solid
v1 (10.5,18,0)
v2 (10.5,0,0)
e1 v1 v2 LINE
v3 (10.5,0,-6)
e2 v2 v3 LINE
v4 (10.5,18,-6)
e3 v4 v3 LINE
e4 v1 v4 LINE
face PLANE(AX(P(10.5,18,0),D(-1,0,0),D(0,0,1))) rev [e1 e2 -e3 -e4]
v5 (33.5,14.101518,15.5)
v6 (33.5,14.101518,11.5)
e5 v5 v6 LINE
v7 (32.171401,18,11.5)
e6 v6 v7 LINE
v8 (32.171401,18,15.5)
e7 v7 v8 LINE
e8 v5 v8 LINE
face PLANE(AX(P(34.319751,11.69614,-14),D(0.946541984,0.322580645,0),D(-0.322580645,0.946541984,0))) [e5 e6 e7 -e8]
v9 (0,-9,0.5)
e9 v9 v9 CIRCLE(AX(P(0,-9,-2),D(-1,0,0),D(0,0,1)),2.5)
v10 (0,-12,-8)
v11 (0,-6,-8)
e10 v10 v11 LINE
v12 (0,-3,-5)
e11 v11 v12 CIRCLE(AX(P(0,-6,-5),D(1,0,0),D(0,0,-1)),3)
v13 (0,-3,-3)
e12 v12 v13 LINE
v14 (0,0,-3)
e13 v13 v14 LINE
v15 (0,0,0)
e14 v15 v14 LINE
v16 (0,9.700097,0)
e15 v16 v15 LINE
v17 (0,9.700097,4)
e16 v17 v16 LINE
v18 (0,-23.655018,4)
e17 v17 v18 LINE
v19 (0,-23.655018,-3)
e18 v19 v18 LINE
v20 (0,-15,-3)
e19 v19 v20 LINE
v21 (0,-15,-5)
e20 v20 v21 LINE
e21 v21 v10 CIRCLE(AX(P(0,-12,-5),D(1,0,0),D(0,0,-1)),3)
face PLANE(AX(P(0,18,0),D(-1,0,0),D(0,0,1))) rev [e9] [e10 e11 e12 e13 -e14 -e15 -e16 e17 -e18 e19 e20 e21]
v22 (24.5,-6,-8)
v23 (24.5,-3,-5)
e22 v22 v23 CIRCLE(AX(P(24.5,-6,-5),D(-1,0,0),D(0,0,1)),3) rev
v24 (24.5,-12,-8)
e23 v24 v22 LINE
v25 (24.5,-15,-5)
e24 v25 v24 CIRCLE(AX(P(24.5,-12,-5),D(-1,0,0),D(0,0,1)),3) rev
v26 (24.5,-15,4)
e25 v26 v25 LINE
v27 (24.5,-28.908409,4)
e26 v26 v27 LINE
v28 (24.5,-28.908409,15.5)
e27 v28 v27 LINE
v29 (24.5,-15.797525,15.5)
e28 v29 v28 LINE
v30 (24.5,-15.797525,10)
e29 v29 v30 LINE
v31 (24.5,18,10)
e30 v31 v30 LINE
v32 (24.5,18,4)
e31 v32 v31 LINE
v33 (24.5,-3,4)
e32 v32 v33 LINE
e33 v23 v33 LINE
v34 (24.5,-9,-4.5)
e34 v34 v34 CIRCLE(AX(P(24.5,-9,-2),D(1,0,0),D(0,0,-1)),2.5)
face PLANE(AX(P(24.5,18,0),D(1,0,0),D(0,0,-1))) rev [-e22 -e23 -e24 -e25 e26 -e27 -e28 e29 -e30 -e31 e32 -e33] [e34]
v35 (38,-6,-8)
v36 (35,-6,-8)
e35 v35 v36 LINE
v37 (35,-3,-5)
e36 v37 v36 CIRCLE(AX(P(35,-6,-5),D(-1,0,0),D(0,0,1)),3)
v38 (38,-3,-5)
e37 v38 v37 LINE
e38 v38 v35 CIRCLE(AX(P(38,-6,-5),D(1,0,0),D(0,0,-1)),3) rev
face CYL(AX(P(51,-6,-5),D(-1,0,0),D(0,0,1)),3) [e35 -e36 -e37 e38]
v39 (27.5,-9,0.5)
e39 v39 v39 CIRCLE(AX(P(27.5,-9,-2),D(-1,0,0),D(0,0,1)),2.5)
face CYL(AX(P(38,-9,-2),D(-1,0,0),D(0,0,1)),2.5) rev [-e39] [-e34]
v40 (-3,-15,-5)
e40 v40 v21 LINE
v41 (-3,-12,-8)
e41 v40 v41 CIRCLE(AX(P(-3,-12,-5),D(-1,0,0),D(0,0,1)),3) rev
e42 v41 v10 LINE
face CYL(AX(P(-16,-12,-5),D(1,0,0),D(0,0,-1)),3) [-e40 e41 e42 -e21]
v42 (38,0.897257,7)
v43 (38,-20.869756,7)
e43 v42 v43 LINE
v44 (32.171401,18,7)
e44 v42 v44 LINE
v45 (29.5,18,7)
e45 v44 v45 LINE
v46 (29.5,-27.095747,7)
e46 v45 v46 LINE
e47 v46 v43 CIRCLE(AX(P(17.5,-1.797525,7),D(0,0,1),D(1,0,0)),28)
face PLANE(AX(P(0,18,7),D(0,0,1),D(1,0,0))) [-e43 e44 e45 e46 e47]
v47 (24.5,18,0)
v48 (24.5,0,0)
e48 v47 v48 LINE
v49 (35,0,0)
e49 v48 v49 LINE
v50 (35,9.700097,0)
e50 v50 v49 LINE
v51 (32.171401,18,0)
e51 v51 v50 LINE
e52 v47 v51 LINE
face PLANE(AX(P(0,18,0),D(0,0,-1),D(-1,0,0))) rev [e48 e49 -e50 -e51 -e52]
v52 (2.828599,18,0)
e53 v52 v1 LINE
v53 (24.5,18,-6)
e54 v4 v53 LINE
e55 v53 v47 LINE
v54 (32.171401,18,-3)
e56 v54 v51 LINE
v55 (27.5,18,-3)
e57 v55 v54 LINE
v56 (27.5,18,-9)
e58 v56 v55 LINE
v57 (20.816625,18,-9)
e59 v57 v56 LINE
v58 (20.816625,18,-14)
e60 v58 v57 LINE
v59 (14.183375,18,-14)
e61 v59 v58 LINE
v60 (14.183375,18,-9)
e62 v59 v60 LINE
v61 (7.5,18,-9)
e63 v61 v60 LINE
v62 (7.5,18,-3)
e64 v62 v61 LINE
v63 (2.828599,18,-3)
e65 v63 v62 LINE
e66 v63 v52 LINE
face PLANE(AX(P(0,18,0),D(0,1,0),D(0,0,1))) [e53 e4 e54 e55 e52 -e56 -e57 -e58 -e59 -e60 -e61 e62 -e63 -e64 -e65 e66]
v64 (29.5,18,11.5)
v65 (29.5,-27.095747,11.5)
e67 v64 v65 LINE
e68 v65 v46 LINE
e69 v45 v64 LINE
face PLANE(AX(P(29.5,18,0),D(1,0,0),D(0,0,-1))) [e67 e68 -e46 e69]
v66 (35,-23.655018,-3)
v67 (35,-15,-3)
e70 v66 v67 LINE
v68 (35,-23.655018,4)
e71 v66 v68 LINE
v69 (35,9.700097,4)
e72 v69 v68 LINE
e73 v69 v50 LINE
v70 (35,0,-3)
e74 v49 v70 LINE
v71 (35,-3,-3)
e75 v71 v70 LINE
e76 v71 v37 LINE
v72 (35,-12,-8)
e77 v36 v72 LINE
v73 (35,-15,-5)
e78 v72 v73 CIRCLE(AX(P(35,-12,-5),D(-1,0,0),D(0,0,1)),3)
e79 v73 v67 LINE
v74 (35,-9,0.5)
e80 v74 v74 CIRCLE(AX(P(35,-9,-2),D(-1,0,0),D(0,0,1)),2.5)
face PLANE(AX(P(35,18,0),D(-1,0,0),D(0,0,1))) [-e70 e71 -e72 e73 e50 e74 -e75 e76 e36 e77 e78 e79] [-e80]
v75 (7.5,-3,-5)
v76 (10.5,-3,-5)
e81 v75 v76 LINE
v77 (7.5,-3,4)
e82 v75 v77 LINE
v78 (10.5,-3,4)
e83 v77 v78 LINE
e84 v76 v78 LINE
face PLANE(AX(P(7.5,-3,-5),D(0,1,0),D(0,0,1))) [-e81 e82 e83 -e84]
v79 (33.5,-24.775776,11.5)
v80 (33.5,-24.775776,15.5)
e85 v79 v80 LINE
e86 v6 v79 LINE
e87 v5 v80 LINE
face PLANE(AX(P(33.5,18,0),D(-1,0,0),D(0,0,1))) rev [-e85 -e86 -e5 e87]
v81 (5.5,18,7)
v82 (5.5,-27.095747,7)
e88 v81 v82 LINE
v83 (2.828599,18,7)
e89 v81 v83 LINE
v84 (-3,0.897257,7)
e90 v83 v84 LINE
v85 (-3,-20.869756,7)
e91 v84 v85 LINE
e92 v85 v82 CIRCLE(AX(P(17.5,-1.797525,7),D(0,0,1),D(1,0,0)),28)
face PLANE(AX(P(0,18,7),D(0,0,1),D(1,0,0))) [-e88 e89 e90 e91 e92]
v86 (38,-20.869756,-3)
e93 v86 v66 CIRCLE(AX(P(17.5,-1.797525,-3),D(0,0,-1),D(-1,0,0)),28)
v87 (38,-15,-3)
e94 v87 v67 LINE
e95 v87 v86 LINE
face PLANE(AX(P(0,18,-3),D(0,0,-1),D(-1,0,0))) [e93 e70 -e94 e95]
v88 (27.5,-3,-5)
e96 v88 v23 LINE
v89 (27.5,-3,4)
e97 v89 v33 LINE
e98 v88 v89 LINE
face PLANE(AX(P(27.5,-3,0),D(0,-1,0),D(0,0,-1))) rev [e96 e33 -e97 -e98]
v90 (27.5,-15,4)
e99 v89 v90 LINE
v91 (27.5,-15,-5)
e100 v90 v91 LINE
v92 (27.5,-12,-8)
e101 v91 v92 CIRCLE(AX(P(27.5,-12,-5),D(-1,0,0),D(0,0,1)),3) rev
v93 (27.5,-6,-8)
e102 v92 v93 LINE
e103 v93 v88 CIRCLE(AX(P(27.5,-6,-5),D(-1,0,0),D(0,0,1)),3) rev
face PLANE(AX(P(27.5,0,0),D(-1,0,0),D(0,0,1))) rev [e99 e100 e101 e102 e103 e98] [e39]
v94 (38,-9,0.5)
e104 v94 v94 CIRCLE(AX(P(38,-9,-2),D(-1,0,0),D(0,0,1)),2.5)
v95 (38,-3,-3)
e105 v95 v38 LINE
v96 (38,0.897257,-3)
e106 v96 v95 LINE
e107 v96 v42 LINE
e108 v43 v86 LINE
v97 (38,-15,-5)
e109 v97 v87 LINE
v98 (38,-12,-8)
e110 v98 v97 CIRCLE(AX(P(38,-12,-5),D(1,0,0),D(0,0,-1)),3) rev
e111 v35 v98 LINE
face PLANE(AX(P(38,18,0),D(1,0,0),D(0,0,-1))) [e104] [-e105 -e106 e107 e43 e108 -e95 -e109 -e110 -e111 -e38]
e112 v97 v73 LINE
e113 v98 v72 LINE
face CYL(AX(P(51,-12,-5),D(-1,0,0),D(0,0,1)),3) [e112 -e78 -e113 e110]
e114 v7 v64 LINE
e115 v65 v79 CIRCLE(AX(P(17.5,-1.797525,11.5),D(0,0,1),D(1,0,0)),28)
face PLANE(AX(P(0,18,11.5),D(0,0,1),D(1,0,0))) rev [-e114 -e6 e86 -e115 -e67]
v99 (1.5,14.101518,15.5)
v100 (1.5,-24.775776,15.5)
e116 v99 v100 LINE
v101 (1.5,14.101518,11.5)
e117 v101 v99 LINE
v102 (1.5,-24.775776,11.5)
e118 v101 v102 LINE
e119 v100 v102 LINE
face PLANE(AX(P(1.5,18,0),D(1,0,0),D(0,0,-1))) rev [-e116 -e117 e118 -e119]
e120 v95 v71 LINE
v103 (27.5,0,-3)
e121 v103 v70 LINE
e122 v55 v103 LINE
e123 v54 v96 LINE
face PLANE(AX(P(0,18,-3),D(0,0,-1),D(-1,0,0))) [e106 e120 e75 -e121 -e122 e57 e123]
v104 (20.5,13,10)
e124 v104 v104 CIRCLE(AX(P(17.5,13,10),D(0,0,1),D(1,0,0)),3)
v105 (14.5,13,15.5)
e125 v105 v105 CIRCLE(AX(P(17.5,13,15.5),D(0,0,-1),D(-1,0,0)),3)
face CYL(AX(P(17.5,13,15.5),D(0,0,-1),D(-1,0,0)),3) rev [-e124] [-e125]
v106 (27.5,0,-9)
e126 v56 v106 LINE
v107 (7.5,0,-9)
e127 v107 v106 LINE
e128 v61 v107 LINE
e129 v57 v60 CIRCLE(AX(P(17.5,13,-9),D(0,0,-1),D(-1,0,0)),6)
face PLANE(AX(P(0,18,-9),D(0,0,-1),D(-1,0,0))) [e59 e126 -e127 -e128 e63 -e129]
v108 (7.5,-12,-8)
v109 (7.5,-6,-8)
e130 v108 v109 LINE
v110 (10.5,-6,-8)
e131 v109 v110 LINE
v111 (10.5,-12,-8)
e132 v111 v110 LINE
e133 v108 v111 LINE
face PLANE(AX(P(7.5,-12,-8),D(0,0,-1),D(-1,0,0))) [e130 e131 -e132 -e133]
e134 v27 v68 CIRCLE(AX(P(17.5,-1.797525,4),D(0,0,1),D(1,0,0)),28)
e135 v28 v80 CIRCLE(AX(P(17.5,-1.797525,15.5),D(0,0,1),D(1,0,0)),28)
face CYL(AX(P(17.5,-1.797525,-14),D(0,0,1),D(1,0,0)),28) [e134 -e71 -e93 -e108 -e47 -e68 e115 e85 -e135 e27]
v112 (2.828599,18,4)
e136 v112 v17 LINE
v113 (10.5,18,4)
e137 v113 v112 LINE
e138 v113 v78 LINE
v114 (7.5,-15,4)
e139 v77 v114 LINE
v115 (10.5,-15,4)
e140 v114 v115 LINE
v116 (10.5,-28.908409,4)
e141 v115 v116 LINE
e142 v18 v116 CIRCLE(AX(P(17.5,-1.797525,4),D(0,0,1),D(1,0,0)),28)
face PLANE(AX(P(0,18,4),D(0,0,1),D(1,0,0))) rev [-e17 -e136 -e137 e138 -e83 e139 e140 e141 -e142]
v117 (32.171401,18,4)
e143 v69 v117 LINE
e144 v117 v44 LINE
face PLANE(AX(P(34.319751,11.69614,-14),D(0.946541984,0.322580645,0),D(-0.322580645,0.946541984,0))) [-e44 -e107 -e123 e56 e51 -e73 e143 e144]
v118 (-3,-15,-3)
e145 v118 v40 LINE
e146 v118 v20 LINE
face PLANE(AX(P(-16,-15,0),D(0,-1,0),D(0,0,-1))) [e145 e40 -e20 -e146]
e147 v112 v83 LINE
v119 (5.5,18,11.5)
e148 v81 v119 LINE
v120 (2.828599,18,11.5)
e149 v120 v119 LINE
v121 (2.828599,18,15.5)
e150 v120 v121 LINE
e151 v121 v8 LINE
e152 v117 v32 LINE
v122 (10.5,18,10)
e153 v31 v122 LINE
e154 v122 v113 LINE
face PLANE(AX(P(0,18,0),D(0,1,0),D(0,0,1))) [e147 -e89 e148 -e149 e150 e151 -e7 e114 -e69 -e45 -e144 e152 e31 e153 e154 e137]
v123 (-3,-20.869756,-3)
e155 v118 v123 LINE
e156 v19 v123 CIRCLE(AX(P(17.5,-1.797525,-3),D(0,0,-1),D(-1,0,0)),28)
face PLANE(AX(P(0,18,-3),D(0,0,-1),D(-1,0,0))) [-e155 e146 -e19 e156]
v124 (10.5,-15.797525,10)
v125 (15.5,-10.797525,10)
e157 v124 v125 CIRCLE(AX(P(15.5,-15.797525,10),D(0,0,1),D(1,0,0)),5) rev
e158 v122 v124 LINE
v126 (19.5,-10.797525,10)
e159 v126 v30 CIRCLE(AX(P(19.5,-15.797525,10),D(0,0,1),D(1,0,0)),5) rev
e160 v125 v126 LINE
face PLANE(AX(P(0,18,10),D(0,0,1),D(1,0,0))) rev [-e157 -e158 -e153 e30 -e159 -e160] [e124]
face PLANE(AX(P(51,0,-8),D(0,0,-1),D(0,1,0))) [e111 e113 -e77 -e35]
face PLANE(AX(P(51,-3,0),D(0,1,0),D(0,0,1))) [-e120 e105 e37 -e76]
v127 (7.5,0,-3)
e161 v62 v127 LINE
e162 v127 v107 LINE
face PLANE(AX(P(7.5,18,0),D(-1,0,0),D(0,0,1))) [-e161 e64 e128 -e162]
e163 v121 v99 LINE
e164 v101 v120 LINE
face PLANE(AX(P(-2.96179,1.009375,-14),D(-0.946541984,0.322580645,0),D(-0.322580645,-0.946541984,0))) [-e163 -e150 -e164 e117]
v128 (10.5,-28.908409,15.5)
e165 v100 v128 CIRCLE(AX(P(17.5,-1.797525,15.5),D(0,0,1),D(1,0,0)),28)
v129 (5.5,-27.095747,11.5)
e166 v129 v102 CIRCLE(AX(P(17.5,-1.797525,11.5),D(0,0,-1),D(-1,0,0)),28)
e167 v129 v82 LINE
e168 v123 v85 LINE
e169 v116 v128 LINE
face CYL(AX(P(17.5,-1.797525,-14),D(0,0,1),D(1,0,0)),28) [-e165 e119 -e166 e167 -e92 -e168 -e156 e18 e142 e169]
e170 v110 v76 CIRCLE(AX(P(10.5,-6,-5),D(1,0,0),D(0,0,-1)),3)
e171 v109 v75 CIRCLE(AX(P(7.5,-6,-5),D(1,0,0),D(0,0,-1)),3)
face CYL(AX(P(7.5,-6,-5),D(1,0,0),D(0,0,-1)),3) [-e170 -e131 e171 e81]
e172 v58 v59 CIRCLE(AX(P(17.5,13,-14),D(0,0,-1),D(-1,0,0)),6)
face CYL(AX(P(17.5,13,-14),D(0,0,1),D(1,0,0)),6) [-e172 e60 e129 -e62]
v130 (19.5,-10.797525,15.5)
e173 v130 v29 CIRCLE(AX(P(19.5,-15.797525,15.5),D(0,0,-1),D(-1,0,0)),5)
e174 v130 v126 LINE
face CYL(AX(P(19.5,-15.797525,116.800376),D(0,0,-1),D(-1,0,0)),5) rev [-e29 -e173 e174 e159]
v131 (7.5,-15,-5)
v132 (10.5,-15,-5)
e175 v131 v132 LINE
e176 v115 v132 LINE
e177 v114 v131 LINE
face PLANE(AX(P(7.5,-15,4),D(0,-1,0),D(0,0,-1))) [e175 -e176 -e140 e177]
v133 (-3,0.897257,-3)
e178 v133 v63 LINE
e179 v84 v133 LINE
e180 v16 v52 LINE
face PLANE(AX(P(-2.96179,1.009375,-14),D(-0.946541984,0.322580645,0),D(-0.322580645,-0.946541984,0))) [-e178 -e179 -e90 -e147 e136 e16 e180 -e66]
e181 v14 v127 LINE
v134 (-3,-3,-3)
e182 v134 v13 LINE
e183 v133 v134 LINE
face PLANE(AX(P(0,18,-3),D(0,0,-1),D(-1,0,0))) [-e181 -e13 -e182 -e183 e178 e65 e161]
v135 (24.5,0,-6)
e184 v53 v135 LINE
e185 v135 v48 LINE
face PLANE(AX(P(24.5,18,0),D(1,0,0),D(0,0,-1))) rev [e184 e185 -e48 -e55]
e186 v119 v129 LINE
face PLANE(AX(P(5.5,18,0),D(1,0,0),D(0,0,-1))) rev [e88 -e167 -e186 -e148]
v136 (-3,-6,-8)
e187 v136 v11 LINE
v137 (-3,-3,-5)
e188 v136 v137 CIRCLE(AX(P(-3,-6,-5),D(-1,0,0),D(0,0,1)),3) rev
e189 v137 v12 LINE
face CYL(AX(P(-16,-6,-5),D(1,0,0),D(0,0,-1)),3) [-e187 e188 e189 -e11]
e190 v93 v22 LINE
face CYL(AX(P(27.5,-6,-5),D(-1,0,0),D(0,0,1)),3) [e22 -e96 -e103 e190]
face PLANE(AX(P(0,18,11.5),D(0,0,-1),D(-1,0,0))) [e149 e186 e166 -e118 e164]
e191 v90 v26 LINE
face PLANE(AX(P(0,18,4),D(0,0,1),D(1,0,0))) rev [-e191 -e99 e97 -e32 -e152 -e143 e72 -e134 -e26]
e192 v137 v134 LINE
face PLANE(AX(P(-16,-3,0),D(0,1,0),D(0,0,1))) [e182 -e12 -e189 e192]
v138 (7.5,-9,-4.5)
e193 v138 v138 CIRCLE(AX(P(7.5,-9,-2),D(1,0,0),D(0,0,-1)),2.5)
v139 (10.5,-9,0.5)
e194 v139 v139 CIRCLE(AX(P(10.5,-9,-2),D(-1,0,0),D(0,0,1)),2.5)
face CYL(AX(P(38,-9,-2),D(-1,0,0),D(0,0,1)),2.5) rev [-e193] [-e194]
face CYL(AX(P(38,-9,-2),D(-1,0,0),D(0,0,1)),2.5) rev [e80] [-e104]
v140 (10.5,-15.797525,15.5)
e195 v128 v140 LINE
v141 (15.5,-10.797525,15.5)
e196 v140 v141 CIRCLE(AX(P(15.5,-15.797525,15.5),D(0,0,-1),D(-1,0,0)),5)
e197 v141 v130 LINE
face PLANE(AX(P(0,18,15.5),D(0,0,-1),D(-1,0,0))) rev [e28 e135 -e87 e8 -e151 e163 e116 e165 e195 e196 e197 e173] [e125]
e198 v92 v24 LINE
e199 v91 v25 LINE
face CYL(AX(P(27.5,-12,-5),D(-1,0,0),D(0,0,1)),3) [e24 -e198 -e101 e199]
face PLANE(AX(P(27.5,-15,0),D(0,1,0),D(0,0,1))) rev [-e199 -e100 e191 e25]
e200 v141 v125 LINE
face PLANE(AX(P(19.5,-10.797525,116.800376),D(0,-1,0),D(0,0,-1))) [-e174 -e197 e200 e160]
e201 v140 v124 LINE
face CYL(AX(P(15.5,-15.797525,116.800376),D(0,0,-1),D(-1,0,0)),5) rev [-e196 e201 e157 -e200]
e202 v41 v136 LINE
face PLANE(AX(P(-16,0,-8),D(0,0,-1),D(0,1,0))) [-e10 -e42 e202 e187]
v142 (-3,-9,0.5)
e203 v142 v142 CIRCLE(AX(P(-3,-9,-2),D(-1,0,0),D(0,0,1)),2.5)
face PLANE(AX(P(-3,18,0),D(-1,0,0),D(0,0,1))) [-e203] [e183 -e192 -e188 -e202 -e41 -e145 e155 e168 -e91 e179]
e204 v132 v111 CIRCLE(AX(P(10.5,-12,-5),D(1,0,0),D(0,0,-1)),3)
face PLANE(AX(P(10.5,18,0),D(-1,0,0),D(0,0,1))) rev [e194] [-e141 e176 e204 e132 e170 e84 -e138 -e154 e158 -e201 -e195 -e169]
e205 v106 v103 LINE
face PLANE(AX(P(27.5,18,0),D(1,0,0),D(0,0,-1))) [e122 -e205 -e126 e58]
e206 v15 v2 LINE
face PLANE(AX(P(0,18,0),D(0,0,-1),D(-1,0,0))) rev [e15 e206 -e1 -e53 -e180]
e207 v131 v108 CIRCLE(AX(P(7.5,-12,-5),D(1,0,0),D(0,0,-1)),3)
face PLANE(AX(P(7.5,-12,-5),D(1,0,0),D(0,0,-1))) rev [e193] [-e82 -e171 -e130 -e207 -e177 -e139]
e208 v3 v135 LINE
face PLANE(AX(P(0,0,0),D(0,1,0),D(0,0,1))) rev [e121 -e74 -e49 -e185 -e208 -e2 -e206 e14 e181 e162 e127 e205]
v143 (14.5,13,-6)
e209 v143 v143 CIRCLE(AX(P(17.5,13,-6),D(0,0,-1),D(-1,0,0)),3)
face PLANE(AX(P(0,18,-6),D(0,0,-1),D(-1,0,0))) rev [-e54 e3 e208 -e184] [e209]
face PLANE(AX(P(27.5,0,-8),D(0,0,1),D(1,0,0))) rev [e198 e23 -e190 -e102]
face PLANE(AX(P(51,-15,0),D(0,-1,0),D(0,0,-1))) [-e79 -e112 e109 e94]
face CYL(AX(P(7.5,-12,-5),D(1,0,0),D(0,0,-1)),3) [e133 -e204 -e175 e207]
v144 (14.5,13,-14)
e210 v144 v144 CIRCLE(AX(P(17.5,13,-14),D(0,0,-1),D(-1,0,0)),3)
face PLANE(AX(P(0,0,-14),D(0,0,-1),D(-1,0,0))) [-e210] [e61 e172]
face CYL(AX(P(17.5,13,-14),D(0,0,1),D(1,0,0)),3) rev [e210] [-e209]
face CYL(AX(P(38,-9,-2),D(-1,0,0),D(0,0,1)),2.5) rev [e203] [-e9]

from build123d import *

# Parameters (mm, degrees)
BOSS_EXTRUDE1_DEPTH     = 18
SKETCH2_R               = 3
BOSS_EXTRUDE2_DEPTH     = 5
SKETCH2_3_R             = 3
CUT_EXTRUDE1_DEPTH      = 49.664668909
SKETCH1_3_W             = 2
SKETCH1_3_H             = 4.5
BOSS_EXTRUDE3_DEPTH     = 30
SKETCH3_OUTSIDE_W       = 56.936
SKETCH3_OUTSIDE_H       = 63.936
SKETCH3_OUTSIDE_R       = 28
CUT_EXTRUDE2_DEPTH      = 57.69435598
CUT_EXTRUDE3_START      = -18.5
CUT_EXTRUDE3_DEPTH      = 18.5
CUT_EXTRUDE4_DEPTH      = 57.587476675
CUT_EXTRUDE4_DEPTH_BACK = 10
SKETCH7_R               = 2.5
BOSS_EXTRUDE4_DEPTH     = 3
BOSS_EXTRUDE6_START     = -3
BOSS_EXTRUDE6_DEPTH     = 3
BOSS_EXTRUDE7_START     = -3
BOSS_EXTRUDE7_DEPTH     = 3
BOSS_EXTRUDE8_START     = -3
BOSS_EXTRUDE8_DEPTH     = 3
CUT_EXTRUDE5_DEPTH      = 43.804159814
CUT_EXTRUDE5_DEPTH_BACK = 43.804159814
SKETCH7_3_R             = 2.5


# Read off the part's stored shape, not the designer's step: Cut-Extrude3
with BuildPart() as part:
    # Sketch1 → Boss-Extrude1 (new body)
    with BuildSketch(Plane(origin=(0, 0, 0), x_dir=(1, 0, 0), z_dir=(0, 1, 0))):
        Polygon((7.5, 3), (-3, 3), (-3, -7), (5.5, -7), (5.5, -11.5), (1.5, -11.5), (1.5, -15.5), (33.5, -15.5), (33.5, -11.5), (29.5, -11.5), (29.5, -7), (38, -7), (38, 3), (27.5, 3), (27.5, 9), (7.5, 9), align=None)
        Polygon((24.5, 0), (35, 0), (35, -4), (24.5, -4), (24.5, -10), (10.5, -10), (10.5, -4), (0, -4), (0, 0), (10.5, 0), (10.5, 6), (24.5, 6), align=None, mode=Mode.SUBTRACT)
    extrude(amount=BOSS_EXTRUDE1_DEPTH)

    # Sketch2 → Boss-Extrude2 (add)
    with BuildSketch(Plane(origin=(0, 0, -9), x_dir=(-1, 0, 0), z_dir=(0, 0, -1))):
        with BuildLine():
            ThreePointArc((-20.81662479, 18), (-20.337274331, 7.713235926), (-11.5, 13))
            ThreePointArc((-11.5, 13), (-12.213235926, 15.837274331), (-14.18337521, 18))
            Line((-14.18337521, 18), (-20.81662479, 18))
        make_face()
        with Locations((-17.5, 13)):
            Circle(SKETCH2_R, mode=Mode.SUBTRACT)
    extrude(amount=BOSS_EXTRUDE2_DEPTH)

    # Sketch2<3> → Cut-Extrude1 (cut, through all)
    with BuildSketch(Plane(origin=(0, 0, -9), x_dir=(-1, 0, 0), z_dir=(0, 0, -1))):
        with Locations((-17.5, 13)):
            Circle(SKETCH2_3_R)
    extrude(amount=-CUT_EXTRUDE1_DEPTH, mode=Mode.SUBTRACT)

    # Sketch1<3> → Boss-Extrude3 (add)
    with BuildSketch(Plane(origin=(0, 0, 0), x_dir=(1, 0, 0), z_dir=(0, 1, 0))):
        Polygon((0, -4), (0, 0), (0, 3), (-3, 3), (-3, -7), (5.5, -7), (7.5, -7), (7.5, -11.5), (7.5, -13), (27.5, -13), (27.5, -11.5), (27.5, -7), (29.5, -7), (38, -7), (38, 3), (35, 3), (35, 0), (35, -4), (24.5, -4), (24.5, -10), (10.5, -10), (10.5, -4), align=None)
        with Locations((28.5, -9.25)):
            Rectangle(SKETCH1_3_W, SKETCH1_3_H)
        Polygon((7.5, -11.5), (5.5, -11.5), (1.5, -11.5), (1.5, -15.5), (33.5, -15.5), (33.5, -11.5), (29.5, -11.5), (27.5, -11.5), (27.5, -13), (7.5, -13), align=None)
        with Locations((6.5, -9.25)):
            Rectangle(SKETCH1_3_W, SKETCH1_3_H)
    extrude(amount=-BOSS_EXTRUDE3_DEPTH)

    # Sketch3 outside → Cut-Extrude2 (cut, through all)
    with BuildSketch(Plane.XY.offset(15.5)):
        with Locations((17.5, -6)):
            Rectangle(SKETCH3_OUTSIDE_W, SKETCH3_OUTSIDE_H)
        with Locations((17.5, -1.797525342)):
            Circle(SKETCH3_OUTSIDE_R, mode=Mode.SUBTRACT)
    extrude(amount=-CUT_EXTRUDE2_DEPTH, mode=Mode.SUBTRACT)

    # Cut-Extrude3 outline → Cut-Extrude3 (cut)
    with BuildSketch(Plane.XY.offset(15.5).offset(CUT_EXTRUDE3_START)):
        with BuildLine():
            Line((32.171400751, 18), (38, 0.89725692))
            Line((38, 0.89725692), (38, 17.274705781))
            ThreePointArc((38, 17.274705781), (37.653490195, 17.640500097), (37.300454296, 18))
            Line((37.300454296, 18), (32.171400751, 18))
        make_face()
        with BuildLine():
            Line((2.828599249, 18), (-2.300454296, 18))
            ThreePointArc((-2.300454296, 18), (-2.653490195, 17.640500097), (-3, 17.274705781))
            Line((-3, 17.274705781), (-3, 0.89725692))
            Line((-3, 0.89725692), (2.828599249, 18))
        make_face()
    extrude(amount=CUT_EXTRUDE3_DEPTH, mode=Mode.SUBTRACT)

    # Sketch5 → Cut-Extrude4 (cut, two sides: drawn at the far end of the back side and taken through both)
    with BuildSketch(Plane.XY.offset(15.5).offset(-CUT_EXTRUDE4_DEPTH_BACK)):
        with BuildLine():
            ThreePointArc((10.5, -28.908408765), (17.5, -29.797525342), (24.5, -28.908408765))
            Line((24.5, -28.908408765), (24.5, -15.797525342))
            ThreePointArc((24.5, -15.797525342), (23.035533906, -12.261991436), (19.5, -10.797525342))
            Line((19.5, -10.797525342), (15.5, -10.797525342))
            ThreePointArc((15.5, -10.797525342), (11.964466094, -12.261991436), (10.5, -15.797525342))
            Line((10.5, -15.797525342), (10.5, -28.908408765))
        make_face()
    extrude(amount=CUT_EXTRUDE4_DEPTH + CUT_EXTRUDE4_DEPTH_BACK, mode=Mode.SUBTRACT)

    # Sketch7 → Boss-Extrude4 (add)
    # profile 1 of 2: a face of its own
    with BuildSketch(Plane.ZY.offset(-24.5)):
        with BuildLine():
            Line((-5, -15), (4, -15))
            Line((4, -15), (4, -3))
            Line((4, -3), (-5, -3))
            ThreePointArc((-5, -3), (-7.121320344, -3.878679656), (-8, -6))
            Line((-8, -6), (-8, -12))
            ThreePointArc((-8, -12), (-7.121320344, -14.121320344), (-5, -15))
        make_face()
        with Locations((-2, -9)):
            Circle(SKETCH7_R, mode=Mode.SUBTRACT)
    # profile 2 of 2: a face of its own
    with BuildSketch(Plane.ZY.offset(-24.5)):
        with Locations((-2, -9)):
            Circle(SKETCH7_R)
    extrude(amount=-BOSS_EXTRUDE4_DEPTH)

    # Sketch9 → Boss-Extrude6 (add)
    with BuildSketch(Plane(origin=(10.5, 0, 0), x_dir=(0, 0, -1), z_dir=(1, 0, 0)).offset(BOSS_EXTRUDE6_START)):
        with BuildLine():
            Line((-4, -15), (5, -15))
            ThreePointArc((5, -15), (7.121320344, -14.121320344), (8, -12))
            Line((8, -12), (8, -6))
            ThreePointArc((8, -6), (7.121320344, -3.878679656), (5, -3))
            Line((5, -3), (-4, -3))
            Line((-4, -3), (-4, -15))
        make_face()
    extrude(amount=BOSS_EXTRUDE6_DEPTH)

    # Sketch10 → Boss-Extrude7 (add)
    with BuildSketch(Plane.ZY.offset(-35).offset(BOSS_EXTRUDE7_START)):
        with BuildLine():
            Line((-5, -15), (-3, -15))
            Line((-3, -15), (-3, -3))
            Line((-3, -3), (-5, -3))
            ThreePointArc((-5, -3), (-7.121320344, -3.878679656), (-8, -6))
            Line((-8, -6), (-8, -12))
            ThreePointArc((-8, -12), (-7.121320344, -14.121320344), (-5, -15))
        make_face()
    extrude(amount=BOSS_EXTRUDE7_DEPTH)

    # Sketch11 → Boss-Extrude8 (add)
    with BuildSketch(Plane(origin=(0, 0, 0), x_dir=(0, 0, -1), z_dir=(1, 0, 0)).offset(BOSS_EXTRUDE8_START)):
        with BuildLine():
            Line((5, -3), (3, -3))
            Line((3, -3), (3, -6.708712153))
            ThreePointArc((3, -6.708712153), (4.091650066, -7.630693606), (4.5, -9))
            ThreePointArc((4.5, -9), (4.091650066, -10.369306394), (3, -11.291287847))
            Line((3, -11.291287847), (3, -15))
            Line((3, -15), (5, -15))
            ThreePointArc((5, -15), (7.121320344, -14.121320344), (8, -12))
            Line((8, -12), (8, -6))
            ThreePointArc((8, -6), (7.121320344, -3.878679656), (5, -3))
        make_face()
        with BuildLine():
            ThreePointArc((4.5, -9), (4.091650066, -7.630693606), (3, -6.708712153))
            Line((3, -6.708712153), (3, -11.291287847))
            ThreePointArc((3, -11.291287847), (4.091650066, -10.369306394), (4.5, -9))
        make_face()
        with BuildLine():
            Line((3, -11.291287847), (3, -6.708712153))
            ThreePointArc((3, -6.708712153), (-0.5, -9), (3, -11.291287847))
        make_face()
    extrude(amount=BOSS_EXTRUDE8_DEPTH)

    # Sketch7<3> → Cut-Extrude5 (cut, two sides: drawn at the far end of the back side and taken through both)
    with BuildSketch(Plane.ZY.offset(-24.5).offset(-CUT_EXTRUDE5_DEPTH_BACK)):
        with Locations((-2, -9)):
            Circle(SKETCH7_3_R)
    extrude(amount=CUT_EXTRUDE5_DEPTH + CUT_EXTRUDE5_DEPTH_BACK, mode=Mode.SUBTRACT)


solid = part.part
